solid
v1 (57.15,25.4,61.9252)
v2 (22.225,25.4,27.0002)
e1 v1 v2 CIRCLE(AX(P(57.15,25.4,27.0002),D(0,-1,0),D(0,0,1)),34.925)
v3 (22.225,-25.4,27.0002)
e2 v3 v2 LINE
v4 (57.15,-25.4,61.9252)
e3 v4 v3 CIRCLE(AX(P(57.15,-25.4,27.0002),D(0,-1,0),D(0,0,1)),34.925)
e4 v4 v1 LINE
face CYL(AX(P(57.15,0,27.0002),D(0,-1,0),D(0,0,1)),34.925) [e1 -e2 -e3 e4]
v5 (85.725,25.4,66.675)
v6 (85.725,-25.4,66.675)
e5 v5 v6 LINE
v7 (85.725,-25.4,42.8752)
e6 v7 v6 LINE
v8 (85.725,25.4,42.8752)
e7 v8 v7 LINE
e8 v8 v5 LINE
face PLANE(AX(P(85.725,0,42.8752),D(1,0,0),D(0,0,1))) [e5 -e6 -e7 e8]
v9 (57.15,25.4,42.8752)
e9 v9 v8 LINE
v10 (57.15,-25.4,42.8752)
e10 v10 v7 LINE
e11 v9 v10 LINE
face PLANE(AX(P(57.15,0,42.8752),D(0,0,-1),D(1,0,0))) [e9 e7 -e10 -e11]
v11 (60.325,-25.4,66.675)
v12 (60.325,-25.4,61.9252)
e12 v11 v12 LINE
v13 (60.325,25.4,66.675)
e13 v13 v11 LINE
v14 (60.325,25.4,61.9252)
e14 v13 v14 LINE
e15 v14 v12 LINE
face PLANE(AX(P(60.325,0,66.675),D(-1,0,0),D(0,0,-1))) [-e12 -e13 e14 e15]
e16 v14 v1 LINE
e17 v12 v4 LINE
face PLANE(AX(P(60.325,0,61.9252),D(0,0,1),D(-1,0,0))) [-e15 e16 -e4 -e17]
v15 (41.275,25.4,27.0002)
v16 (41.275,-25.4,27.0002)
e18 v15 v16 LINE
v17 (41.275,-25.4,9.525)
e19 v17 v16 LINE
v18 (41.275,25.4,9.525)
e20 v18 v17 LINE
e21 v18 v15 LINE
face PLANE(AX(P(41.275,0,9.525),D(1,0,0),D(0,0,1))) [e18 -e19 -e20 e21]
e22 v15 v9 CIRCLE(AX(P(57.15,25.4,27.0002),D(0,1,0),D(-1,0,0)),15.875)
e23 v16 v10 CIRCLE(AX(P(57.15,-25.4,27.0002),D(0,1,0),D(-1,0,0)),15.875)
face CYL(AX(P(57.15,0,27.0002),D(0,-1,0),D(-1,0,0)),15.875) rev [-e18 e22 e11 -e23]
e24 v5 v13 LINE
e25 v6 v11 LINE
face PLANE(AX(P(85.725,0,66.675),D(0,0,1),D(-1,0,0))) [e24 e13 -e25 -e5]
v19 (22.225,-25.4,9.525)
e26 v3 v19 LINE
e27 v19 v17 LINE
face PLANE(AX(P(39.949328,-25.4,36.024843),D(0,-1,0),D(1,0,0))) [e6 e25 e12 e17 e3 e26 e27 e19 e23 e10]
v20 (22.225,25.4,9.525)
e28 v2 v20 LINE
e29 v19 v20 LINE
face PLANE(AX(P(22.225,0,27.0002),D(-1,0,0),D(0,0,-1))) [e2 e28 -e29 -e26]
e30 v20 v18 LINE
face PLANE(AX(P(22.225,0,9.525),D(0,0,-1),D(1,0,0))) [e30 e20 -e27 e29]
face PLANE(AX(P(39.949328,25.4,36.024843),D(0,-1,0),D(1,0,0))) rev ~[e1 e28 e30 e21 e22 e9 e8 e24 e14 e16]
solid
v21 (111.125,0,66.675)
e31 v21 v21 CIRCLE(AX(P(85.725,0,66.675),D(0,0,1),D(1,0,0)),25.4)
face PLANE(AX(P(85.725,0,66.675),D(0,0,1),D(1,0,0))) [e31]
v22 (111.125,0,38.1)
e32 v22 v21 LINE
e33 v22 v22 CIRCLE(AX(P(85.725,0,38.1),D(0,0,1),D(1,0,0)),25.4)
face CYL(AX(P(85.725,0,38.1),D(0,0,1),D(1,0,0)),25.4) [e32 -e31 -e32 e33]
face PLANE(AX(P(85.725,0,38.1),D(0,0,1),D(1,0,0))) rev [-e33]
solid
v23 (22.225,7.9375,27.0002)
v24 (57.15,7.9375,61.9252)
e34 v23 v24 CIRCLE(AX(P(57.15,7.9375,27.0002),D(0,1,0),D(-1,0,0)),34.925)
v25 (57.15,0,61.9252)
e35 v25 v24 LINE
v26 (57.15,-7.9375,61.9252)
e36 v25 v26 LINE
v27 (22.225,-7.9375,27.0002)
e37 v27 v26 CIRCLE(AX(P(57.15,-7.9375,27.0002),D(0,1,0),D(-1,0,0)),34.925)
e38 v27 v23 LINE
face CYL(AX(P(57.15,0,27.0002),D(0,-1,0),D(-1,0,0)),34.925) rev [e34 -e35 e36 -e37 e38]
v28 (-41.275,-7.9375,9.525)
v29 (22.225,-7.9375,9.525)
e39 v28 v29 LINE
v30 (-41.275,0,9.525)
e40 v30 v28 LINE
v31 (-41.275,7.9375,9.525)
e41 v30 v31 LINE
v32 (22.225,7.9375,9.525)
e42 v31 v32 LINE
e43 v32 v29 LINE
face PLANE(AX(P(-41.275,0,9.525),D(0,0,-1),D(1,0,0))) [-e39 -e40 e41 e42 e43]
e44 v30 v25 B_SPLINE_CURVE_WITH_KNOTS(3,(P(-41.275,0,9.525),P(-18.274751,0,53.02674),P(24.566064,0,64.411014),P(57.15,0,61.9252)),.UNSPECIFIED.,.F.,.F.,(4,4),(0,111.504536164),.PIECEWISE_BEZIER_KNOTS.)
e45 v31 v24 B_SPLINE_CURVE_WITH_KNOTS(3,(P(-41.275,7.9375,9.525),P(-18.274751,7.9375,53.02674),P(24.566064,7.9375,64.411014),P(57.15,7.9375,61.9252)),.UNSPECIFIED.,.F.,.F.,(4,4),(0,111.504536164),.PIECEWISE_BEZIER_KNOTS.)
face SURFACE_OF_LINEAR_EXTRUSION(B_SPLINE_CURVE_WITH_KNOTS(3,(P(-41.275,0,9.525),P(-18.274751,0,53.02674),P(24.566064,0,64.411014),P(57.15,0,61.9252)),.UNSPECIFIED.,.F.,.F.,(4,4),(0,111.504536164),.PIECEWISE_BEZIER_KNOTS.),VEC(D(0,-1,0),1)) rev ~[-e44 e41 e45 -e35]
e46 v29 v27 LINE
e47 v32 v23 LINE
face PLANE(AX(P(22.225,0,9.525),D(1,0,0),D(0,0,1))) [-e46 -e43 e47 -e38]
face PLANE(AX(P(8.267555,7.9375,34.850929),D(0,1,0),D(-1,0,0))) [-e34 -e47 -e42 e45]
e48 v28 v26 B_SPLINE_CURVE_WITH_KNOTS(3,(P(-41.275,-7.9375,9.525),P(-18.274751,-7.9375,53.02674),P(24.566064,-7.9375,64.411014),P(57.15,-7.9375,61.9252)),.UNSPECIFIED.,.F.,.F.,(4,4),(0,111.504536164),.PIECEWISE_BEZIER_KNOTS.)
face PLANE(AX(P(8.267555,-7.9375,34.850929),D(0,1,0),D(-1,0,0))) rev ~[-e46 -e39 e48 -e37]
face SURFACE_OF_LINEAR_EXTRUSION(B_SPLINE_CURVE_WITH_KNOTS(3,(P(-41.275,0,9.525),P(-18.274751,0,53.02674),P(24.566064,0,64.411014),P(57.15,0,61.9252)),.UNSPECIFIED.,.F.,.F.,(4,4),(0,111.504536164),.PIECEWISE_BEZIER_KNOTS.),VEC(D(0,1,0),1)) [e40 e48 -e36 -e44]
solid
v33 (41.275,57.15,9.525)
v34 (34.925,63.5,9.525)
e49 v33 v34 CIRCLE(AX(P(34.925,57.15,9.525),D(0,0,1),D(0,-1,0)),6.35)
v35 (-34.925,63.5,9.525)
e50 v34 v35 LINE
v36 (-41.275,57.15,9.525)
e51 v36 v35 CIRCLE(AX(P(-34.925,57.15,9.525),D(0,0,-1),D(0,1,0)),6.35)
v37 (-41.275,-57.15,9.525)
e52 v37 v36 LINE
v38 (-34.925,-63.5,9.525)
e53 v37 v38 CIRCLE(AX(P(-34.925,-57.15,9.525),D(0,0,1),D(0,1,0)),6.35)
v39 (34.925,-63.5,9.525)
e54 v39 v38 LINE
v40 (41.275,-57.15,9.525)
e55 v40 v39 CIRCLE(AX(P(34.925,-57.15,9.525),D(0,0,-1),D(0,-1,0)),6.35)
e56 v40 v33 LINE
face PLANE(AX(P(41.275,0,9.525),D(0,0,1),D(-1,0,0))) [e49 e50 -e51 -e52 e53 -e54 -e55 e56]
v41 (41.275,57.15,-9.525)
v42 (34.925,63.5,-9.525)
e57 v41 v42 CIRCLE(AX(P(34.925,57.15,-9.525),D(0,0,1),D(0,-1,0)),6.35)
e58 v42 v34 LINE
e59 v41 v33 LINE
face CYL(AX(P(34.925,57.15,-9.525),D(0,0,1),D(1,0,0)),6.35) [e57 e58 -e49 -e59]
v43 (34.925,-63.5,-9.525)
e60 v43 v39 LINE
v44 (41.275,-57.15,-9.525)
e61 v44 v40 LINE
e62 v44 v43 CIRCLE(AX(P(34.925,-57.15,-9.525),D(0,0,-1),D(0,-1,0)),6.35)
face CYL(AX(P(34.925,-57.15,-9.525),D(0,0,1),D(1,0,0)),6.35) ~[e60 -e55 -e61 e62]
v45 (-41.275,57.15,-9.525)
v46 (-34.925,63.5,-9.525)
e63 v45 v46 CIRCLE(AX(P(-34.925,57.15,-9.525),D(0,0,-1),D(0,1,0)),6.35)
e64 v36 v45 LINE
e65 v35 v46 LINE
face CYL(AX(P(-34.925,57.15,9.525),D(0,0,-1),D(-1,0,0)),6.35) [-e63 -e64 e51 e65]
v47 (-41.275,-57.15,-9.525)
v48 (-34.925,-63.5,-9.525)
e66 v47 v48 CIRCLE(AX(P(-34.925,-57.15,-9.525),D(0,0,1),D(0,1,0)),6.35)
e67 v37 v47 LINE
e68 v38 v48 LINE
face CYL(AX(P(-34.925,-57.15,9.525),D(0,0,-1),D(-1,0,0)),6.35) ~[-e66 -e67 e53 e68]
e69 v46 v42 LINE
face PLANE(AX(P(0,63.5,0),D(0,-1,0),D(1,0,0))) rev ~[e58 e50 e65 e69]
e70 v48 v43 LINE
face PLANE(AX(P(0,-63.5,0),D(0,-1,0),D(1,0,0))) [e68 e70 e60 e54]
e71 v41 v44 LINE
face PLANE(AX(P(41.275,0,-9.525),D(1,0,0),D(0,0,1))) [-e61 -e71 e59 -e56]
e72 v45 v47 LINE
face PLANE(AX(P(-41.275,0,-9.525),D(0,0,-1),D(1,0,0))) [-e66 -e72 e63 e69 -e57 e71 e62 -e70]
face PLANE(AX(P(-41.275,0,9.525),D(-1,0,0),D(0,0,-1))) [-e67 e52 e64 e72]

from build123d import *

# Parameters (mm, degrees)
F1_DEPTH = 63.5
F2_DEPTH = 25.4
F3_DEPTH = 7.9375
F5_R     = 6.35


# Not quite as in the source:
# - a feature names something its author has since deleted; it is built from what else it names


with BuildPart() as f1:
    # F0 (on Front) → F1 (new body, symmetric)
    with BuildSketch(Plane.XZ):
        Polygon((-41.275, 9.525), (-41.275, -9.525), (41.275, -9.525), (41.275, 9.525), (22.225, 9.525), align=None)
    extrude(amount=F1_DEPTH, both=True)

    # F5
    f5_edges = [f1.edges().sort_by_distance(p)[0] for p in [
        (41.275, -63.5, 0),
        (-41.275, -63.5, 0),
        (41.275, 63.5, 0),
        (-41.275, 63.5, 0),
    ]]
    fillet(f5_edges, radius=F5_R)


with BuildPart() as f2:
    # F0 (on Front) → F2 (new body, symmetric)
    with BuildSketch(Plane.XZ):
        with BuildLine():
            Line((22.225, 9.525), (41.275, 9.525))
            Line((41.275, 9.525), (41.275, 27.0002))
            ThreePointArc((41.275, 27.0002), (45.9246798487, 38.2255201513), (57.15, 42.8752))
            Line((57.15, 42.8752), (60.325, 42.8752))
            Line((60.325, 42.8752), (60.325, 61.9252))
            Line((60.325, 61.9252), (57.15, 61.9252))
            ThreePointArc((57.15, 61.9252), (32.4542956671, 51.6959043329), (22.225, 27.0002))
            Line((22.225, 27.0002), (22.225, 9.525))
        make_face()
        Polygon((60.325, 66.675), (60.325, 61.9252), (60.325, 42.8752), (85.725, 42.8752), (85.725, 66.675), align=None)
    extrude(amount=F2_DEPTH, both=True)


with BuildPart() as f3:
    # F0 (on Front) → F3 (new body, symmetric)
    with BuildSketch(Plane.XZ):
        with BuildLine():
            add(Edge.make_bspline(
                [(-41.275, 9.525), (-18.2747505605, 53.0267395079), (24.5660636574, 64.4110143185), (57.15, 61.9252)],
                knots=[0, 0, 0, 0, 111.5045361635, 111.5045361635, 111.5045361635, 111.5045361635], degree=3))
            Line((-41.275, 9.525), (22.225, 9.525))
            Line((22.225, 9.525), (22.225, 27.0002))
            ThreePointArc((22.225, 27.0002), (32.4542956671, 51.6959043329), (57.15, 61.9252))
        make_face()
    extrude(amount=F3_DEPTH, both=True)


with BuildPart() as f4:
    # F0 (on Front) → F4 (revolve)
    with BuildSketch(Plane.XZ):
        Polygon((85.725, 66.675), (85.725, 42.8752), (85.725, 38.1), (111.125, 38.1), (111.125, 66.675), align=None)
    revolve(axis=Axis((85.725, 0, 52.3875), (0, 0, 1)))


solid = Compound([f1.part, f2.part, f3.part, f4.part])
